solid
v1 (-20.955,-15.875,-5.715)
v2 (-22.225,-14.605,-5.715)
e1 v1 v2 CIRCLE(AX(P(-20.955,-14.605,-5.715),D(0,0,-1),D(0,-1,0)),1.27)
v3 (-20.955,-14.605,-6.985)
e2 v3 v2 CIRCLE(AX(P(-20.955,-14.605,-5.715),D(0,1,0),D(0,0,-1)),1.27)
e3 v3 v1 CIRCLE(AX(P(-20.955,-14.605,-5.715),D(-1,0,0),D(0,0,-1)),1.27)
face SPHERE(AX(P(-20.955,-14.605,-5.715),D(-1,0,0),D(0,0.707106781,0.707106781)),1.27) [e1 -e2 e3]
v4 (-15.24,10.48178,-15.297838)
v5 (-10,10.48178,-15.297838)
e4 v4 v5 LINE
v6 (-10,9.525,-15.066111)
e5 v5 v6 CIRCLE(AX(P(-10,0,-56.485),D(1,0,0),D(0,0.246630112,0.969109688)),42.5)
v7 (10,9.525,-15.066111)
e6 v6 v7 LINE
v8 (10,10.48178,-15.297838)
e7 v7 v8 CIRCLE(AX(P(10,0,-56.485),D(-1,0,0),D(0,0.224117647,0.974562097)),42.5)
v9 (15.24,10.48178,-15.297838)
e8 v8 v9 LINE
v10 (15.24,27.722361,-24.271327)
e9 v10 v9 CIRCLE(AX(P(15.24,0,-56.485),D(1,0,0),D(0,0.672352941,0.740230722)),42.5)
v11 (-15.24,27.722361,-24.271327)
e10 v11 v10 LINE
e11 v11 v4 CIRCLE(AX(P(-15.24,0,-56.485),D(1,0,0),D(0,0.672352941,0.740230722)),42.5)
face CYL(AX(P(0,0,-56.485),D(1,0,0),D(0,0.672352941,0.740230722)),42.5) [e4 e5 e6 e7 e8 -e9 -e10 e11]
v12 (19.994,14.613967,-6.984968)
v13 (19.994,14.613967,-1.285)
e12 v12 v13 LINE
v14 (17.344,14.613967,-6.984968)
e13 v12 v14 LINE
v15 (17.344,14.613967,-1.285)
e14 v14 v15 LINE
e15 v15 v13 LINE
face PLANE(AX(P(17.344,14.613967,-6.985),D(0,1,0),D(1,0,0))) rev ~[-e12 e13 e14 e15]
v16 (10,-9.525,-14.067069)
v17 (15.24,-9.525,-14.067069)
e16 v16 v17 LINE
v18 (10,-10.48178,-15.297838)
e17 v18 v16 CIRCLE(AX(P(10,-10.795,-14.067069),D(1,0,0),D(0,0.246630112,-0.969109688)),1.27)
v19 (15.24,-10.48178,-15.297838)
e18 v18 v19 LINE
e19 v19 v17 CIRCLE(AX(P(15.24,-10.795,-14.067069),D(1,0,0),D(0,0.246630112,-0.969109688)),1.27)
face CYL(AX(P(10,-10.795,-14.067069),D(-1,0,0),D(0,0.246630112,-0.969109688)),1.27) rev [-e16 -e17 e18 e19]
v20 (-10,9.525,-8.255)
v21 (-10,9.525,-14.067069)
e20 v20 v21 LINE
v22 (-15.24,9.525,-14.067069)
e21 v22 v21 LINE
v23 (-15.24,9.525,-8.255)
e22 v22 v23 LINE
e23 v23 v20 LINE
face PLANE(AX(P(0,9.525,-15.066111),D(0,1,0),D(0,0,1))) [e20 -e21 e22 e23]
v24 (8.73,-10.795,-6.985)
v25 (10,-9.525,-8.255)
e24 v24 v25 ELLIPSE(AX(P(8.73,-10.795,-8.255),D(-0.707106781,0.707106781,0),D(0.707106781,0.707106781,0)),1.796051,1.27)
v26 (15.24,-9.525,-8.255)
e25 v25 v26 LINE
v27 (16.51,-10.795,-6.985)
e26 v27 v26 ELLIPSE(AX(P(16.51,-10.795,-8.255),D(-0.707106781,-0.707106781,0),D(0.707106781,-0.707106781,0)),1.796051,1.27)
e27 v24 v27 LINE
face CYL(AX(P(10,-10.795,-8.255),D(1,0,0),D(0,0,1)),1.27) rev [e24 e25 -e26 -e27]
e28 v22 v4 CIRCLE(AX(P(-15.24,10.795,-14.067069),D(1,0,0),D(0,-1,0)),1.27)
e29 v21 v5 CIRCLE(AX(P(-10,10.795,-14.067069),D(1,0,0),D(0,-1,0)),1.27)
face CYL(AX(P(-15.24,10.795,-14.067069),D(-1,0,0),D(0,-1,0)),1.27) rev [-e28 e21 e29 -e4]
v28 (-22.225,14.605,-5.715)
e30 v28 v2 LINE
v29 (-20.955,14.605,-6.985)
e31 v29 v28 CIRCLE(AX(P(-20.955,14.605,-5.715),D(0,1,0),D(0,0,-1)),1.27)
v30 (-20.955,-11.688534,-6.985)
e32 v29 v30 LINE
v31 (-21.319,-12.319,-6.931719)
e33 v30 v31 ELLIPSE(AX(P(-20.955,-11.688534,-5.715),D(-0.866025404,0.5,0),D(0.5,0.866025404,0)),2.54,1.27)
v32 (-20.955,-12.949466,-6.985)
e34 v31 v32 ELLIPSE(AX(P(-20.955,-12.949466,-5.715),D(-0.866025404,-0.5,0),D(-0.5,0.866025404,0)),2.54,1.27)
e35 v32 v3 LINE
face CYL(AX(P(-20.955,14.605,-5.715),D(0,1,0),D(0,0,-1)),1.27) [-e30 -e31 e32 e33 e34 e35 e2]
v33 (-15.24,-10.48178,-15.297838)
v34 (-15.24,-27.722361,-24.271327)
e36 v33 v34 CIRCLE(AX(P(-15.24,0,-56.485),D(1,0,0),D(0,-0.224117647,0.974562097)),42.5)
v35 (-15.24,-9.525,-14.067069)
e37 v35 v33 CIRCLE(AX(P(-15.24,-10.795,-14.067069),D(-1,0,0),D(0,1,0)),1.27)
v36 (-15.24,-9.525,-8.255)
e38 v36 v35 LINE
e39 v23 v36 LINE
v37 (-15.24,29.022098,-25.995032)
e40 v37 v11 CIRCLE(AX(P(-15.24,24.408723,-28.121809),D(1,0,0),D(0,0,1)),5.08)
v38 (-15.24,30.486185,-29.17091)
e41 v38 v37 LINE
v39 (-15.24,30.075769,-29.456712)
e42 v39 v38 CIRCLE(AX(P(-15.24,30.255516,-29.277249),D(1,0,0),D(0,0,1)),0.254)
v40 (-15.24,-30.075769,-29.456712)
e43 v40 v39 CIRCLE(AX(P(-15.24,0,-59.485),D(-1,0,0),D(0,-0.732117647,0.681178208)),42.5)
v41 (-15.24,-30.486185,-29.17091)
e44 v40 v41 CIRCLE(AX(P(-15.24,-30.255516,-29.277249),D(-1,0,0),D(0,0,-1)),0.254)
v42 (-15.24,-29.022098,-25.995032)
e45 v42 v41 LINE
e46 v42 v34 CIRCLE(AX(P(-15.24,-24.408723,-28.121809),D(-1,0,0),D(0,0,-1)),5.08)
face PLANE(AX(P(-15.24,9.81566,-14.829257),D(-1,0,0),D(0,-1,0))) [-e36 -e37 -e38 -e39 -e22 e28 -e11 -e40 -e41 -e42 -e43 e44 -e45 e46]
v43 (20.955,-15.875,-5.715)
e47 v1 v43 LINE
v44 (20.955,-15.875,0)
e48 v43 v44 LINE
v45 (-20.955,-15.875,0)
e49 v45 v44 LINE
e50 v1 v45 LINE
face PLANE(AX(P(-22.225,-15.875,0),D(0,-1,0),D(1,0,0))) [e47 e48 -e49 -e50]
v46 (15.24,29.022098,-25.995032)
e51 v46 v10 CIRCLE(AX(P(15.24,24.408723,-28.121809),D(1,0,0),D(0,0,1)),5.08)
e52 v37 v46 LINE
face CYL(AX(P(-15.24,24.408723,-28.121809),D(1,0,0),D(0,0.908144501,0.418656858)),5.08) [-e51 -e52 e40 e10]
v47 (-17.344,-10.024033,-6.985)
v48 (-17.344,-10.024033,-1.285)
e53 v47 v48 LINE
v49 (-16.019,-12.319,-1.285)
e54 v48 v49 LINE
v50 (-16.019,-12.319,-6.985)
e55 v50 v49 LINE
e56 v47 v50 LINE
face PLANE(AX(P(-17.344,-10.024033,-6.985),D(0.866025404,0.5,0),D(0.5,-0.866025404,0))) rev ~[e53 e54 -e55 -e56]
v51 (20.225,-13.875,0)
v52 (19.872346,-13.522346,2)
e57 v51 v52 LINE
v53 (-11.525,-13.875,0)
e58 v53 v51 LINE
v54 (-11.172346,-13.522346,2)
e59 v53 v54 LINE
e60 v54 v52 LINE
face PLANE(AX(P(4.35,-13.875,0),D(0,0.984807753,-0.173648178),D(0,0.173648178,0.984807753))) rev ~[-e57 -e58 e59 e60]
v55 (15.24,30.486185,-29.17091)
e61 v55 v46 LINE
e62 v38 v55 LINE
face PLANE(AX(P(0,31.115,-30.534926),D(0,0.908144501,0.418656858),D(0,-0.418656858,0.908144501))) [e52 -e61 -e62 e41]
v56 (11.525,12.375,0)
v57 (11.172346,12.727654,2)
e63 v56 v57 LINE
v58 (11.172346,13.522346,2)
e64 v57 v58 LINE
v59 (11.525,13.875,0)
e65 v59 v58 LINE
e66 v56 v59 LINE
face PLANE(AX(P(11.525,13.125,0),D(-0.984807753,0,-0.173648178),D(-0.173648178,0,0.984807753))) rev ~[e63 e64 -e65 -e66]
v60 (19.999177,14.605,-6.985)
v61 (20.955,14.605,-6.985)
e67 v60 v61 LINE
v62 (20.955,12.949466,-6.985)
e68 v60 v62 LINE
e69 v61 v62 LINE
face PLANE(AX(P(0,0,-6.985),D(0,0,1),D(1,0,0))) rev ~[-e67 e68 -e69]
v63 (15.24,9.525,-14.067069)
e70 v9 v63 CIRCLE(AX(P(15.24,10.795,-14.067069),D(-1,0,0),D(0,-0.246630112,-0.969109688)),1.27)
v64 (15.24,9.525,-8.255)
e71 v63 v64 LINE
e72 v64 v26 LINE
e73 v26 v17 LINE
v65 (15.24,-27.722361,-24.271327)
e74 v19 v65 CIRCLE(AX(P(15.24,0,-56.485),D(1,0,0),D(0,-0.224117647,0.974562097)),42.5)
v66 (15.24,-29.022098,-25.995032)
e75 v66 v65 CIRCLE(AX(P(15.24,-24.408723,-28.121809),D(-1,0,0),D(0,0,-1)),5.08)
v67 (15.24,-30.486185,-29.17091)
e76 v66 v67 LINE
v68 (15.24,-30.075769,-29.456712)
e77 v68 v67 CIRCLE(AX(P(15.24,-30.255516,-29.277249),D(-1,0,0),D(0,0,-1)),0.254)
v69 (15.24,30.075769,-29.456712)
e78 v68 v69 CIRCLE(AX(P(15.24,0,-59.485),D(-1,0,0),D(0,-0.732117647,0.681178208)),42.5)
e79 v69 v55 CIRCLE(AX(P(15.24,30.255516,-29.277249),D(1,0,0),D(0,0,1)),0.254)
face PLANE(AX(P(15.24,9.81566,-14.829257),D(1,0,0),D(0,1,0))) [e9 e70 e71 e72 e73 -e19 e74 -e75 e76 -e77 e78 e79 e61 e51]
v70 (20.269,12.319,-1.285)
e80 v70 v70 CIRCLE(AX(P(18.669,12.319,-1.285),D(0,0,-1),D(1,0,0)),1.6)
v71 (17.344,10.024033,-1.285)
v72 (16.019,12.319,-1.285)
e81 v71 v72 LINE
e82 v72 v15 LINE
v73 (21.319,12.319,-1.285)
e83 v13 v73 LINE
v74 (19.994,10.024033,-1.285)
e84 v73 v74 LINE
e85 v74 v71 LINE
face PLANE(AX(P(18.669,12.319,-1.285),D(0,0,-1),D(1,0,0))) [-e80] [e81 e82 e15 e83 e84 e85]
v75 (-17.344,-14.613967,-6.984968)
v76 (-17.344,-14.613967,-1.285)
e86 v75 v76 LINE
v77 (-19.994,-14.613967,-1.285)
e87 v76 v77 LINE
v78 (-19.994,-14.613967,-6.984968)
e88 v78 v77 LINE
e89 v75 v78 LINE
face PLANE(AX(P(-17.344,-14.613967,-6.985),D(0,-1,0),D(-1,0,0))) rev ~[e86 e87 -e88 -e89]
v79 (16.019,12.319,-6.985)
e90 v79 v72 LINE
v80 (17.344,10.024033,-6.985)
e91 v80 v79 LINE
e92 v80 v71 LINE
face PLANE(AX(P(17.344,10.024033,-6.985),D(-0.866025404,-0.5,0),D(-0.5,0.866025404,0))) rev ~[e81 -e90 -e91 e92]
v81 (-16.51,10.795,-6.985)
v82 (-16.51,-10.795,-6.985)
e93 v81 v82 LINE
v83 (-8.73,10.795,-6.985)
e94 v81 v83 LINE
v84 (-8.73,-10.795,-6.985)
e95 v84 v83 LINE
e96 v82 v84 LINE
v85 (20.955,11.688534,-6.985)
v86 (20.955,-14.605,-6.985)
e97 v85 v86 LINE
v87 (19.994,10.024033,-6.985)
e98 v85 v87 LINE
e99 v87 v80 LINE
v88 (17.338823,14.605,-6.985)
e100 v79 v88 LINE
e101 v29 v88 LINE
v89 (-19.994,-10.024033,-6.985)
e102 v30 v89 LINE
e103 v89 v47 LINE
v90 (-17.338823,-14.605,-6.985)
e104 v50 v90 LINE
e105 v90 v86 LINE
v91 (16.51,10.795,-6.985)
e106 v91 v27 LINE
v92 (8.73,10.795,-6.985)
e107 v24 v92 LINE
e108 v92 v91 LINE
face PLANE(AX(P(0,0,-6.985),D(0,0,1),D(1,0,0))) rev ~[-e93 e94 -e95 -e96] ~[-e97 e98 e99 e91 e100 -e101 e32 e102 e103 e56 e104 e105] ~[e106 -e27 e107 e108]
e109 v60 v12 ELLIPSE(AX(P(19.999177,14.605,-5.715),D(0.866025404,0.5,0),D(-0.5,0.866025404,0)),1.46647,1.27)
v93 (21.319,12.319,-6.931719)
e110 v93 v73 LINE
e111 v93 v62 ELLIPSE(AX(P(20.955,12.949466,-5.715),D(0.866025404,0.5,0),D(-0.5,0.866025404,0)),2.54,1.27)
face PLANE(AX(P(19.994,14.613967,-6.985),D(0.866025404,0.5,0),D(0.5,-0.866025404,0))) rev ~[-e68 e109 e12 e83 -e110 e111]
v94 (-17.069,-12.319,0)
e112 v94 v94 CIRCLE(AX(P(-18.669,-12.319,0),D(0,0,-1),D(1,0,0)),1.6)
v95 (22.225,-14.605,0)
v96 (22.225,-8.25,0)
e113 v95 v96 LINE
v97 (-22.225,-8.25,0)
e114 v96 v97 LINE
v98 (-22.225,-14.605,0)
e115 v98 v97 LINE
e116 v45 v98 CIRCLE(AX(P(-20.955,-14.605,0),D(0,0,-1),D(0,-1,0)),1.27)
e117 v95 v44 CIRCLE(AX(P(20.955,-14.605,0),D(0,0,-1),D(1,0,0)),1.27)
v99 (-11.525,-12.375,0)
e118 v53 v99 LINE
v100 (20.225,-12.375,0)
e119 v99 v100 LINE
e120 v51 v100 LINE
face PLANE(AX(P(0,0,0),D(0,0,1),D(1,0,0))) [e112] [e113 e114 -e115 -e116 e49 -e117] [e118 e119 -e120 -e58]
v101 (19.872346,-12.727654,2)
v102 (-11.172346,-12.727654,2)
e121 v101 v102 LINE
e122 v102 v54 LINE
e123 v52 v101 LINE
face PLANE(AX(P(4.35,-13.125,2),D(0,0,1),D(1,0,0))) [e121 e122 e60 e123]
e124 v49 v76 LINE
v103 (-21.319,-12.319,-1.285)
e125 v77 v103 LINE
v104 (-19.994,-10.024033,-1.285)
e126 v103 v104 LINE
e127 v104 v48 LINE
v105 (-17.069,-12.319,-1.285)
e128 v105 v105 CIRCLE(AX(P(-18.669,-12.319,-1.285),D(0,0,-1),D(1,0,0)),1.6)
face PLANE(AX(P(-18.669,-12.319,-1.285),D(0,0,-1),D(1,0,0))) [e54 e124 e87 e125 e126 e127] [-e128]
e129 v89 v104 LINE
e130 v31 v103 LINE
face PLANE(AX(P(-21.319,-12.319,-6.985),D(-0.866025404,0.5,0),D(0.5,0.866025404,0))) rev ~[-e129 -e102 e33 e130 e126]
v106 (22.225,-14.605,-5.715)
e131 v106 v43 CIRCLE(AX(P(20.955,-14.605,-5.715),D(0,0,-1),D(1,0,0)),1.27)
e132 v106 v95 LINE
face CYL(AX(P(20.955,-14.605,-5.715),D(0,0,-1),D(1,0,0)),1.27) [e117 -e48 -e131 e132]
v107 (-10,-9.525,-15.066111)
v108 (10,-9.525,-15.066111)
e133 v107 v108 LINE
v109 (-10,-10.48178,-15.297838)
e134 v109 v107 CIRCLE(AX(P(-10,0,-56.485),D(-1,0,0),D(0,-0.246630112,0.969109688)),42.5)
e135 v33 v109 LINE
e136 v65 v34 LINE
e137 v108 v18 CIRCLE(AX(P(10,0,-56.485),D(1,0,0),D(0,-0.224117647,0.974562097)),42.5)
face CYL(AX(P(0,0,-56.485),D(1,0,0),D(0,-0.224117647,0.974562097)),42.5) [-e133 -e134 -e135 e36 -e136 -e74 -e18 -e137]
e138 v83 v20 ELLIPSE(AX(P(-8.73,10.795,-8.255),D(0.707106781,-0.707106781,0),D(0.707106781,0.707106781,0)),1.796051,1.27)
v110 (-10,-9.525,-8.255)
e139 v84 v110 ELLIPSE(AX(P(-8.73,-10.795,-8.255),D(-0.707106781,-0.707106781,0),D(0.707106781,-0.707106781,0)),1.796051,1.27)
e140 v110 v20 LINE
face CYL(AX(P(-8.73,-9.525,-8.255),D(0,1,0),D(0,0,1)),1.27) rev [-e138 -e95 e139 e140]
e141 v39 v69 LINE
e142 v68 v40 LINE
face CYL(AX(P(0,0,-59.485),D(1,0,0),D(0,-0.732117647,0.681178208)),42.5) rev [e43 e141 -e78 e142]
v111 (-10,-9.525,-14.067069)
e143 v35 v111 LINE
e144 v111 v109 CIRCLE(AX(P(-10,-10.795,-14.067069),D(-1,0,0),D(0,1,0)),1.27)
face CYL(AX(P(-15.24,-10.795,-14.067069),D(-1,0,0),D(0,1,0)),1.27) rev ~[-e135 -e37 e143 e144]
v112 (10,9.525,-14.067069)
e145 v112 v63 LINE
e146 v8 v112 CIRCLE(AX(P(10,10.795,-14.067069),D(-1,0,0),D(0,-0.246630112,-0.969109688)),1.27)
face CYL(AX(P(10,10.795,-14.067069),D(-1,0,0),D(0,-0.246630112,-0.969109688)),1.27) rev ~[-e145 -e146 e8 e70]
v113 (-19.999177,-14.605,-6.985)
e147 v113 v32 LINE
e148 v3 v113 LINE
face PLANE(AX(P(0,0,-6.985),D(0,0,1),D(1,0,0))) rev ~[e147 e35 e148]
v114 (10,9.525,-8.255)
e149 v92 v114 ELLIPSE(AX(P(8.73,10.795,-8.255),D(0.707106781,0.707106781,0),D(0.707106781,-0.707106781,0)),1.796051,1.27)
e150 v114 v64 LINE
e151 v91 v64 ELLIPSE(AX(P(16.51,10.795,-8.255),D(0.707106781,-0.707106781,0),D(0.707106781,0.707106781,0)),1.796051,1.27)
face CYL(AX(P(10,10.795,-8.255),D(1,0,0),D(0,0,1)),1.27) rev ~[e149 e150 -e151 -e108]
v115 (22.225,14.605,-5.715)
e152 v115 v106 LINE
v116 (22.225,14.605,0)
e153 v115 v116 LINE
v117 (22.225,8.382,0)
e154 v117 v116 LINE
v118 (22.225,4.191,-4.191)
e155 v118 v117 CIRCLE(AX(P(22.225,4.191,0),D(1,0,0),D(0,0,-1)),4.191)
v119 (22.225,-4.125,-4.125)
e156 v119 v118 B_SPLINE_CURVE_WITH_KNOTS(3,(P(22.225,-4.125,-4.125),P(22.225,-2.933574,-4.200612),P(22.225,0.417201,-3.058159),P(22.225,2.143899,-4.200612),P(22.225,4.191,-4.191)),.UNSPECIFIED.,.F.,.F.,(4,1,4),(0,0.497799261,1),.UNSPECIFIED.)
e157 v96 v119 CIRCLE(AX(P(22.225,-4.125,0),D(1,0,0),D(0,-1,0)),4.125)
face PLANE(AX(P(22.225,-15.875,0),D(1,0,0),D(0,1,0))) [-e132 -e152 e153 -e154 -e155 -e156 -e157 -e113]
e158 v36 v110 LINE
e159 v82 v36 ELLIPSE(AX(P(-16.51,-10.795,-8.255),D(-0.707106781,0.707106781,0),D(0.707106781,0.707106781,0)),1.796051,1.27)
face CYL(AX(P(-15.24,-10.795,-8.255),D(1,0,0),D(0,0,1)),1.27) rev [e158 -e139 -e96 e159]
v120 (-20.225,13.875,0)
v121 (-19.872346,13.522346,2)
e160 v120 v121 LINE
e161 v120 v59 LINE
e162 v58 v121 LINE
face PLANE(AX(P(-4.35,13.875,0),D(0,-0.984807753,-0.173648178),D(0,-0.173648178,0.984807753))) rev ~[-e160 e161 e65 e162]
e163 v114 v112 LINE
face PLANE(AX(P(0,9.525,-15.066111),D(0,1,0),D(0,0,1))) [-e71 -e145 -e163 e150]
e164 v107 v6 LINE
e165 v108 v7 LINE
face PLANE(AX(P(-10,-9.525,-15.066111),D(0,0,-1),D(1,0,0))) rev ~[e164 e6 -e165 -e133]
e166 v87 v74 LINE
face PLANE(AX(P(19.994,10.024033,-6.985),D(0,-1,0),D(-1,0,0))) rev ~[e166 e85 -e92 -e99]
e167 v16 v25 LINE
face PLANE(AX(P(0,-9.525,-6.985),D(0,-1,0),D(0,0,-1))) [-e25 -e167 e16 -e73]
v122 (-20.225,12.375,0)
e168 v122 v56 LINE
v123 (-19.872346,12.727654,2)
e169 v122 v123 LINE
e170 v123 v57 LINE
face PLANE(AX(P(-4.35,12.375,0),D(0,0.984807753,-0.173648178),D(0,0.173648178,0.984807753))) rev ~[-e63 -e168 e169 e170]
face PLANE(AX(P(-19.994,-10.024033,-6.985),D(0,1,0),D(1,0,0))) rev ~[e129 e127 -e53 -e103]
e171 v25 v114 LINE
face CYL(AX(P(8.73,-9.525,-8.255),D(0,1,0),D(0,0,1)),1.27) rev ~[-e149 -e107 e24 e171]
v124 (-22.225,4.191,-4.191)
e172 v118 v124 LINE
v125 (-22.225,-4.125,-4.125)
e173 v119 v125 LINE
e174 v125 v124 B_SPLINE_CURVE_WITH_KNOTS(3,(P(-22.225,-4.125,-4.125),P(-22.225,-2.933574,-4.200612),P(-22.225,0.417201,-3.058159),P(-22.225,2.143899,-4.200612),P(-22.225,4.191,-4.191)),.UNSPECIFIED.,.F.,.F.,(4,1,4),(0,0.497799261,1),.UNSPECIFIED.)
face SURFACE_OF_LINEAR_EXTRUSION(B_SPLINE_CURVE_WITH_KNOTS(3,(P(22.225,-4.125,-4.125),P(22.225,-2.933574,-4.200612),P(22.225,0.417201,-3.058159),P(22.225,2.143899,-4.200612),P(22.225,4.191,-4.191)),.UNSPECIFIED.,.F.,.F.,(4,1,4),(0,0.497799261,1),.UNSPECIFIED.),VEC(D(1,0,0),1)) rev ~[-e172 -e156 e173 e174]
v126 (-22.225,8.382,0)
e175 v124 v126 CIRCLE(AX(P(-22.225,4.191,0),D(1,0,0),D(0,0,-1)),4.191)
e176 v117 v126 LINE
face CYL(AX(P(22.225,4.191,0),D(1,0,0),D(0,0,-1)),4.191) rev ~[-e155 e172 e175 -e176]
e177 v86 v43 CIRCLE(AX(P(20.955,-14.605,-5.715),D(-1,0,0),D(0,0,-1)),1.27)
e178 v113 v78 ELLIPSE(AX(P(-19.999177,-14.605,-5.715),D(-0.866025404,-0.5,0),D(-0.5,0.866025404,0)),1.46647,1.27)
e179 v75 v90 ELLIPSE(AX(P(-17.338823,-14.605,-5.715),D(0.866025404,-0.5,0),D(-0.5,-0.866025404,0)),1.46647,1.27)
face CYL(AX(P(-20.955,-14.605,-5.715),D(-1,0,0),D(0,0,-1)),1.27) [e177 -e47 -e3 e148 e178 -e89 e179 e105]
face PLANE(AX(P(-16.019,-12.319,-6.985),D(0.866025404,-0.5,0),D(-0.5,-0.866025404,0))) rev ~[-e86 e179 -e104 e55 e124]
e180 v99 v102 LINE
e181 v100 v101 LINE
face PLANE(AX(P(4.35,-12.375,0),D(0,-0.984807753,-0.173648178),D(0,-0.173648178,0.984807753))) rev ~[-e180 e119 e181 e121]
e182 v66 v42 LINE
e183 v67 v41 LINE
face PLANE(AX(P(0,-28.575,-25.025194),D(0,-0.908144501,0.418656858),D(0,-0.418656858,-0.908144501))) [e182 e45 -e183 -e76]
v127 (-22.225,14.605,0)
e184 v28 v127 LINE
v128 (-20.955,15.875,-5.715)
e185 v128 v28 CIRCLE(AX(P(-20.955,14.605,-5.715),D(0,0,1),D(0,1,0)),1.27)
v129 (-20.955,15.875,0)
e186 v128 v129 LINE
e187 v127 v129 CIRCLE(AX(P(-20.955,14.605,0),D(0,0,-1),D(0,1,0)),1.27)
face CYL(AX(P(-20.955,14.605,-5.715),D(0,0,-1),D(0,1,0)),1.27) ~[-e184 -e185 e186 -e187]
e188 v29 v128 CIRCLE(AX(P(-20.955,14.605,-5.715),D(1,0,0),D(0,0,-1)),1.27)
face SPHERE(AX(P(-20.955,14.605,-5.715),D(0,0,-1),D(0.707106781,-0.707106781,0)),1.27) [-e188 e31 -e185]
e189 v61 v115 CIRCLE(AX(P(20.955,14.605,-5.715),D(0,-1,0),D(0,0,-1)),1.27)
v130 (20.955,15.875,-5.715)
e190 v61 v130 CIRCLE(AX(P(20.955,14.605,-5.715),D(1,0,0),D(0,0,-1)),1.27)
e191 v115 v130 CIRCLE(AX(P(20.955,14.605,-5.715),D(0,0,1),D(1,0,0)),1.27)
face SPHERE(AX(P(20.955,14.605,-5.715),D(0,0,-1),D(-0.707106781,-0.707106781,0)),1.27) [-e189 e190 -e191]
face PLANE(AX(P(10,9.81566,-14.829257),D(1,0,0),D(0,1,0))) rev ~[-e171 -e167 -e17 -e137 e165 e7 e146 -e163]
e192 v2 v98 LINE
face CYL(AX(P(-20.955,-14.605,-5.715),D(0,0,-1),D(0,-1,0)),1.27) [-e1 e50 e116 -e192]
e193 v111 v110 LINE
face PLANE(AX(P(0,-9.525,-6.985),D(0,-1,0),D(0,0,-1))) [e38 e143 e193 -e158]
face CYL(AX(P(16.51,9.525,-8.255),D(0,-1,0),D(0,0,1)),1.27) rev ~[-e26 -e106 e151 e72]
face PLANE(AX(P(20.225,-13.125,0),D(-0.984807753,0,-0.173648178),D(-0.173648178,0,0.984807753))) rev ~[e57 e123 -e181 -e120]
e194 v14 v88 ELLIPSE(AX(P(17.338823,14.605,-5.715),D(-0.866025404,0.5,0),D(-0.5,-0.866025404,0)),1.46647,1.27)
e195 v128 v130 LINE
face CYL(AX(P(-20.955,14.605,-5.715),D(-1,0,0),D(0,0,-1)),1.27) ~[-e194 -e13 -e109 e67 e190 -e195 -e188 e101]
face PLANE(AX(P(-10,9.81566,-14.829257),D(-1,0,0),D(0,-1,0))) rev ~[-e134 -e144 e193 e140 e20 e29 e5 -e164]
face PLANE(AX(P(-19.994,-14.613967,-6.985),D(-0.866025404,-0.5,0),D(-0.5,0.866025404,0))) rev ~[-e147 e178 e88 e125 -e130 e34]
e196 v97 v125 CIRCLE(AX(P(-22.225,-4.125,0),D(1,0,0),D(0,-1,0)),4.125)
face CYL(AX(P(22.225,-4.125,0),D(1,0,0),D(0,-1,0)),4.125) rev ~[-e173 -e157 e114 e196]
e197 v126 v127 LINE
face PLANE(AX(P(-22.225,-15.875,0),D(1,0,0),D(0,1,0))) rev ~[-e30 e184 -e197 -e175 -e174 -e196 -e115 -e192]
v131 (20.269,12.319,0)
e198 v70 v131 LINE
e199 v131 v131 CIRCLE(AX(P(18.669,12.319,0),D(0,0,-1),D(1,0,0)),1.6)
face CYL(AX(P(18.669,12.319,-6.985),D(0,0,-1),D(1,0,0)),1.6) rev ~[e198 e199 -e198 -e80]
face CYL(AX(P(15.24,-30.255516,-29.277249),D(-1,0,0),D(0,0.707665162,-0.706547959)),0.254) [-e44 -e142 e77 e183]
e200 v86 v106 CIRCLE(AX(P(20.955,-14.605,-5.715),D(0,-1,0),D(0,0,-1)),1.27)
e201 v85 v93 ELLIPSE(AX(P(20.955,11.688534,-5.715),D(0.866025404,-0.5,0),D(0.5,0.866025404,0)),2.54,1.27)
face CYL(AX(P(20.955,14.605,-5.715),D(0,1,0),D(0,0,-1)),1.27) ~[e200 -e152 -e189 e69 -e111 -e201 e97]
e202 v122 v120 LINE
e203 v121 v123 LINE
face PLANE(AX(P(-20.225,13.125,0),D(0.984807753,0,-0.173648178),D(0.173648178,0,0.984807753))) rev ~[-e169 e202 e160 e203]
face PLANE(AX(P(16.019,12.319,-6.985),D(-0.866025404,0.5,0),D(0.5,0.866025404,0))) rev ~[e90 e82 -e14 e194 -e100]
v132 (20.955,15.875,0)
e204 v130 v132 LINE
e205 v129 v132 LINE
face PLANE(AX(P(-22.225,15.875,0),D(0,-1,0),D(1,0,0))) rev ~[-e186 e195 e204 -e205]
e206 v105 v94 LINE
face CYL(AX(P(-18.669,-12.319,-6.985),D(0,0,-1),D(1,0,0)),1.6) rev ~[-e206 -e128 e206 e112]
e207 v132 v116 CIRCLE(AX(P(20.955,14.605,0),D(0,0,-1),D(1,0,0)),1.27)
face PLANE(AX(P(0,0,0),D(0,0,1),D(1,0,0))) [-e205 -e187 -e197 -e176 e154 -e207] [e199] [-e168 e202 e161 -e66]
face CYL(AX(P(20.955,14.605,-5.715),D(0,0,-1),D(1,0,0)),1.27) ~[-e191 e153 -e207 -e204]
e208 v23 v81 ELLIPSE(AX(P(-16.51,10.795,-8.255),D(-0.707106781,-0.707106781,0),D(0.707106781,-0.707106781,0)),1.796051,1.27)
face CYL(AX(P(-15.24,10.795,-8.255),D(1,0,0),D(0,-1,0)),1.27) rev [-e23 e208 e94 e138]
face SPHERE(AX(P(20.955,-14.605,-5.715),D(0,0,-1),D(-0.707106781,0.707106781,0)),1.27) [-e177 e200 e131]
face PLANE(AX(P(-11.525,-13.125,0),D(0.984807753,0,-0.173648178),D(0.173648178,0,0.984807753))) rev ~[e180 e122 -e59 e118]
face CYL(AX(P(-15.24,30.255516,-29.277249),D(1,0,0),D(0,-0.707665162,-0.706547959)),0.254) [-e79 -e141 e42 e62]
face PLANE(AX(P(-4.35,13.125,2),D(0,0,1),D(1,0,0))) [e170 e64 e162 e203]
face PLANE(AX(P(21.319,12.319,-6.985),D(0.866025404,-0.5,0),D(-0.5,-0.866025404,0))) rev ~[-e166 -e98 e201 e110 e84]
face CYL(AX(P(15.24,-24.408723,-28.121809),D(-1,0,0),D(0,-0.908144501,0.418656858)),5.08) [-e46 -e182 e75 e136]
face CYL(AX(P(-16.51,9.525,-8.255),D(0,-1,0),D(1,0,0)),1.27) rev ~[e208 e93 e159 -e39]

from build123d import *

# Parameters (mm, degrees)
F1_W          = 44.45
F1_H          = 31.75
F2_DEPTH      = 6.985
F4_DEPTH      = 44.45
F6_DEPTH      = 15.24
F6_DEPTH_BACK = 15.24
F7_W          = 20
F7_H          = 8.0811108913
F8_DEPTH      = 25.4
F9_R          = 1.6
F10_DEPTH     = 25.4
F11_R         = 1.6
F12_DEPTH     = 5.7
F13_W         = 31.75
F13_H         = 1.5
F14_DEPTH     = 2
F14_TAPER     = 10
F15_F1_R      = 0.254
F15_F2_R      = 0.254
F16_R         = 5.08
F18_R         = 1.27
F19_T1_DEPTH  = 5.24
F19_T3_DEPTH  = 5.24
F19_T5_DEPTH  = 8.89
F19_T7_DEPTH  = 29.21
F19_T9_DEPTH  = 41.91
F19_S13_W     = 1.2954
F19_S13_H     = 1.2954
F19_T14_DEPTH = 1.2954
F19_S19_W     = 1.2954
F19_S19_H     = 1.2954
F19_T20_DEPTH = 1.2954
F19_S25_W     = 1.2954
F19_S25_H     = 1.2954
F19_T26_DEPTH = 1.2954
F19_S31_W     = 1.2954
F19_S31_H     = 1.2954
F19_T32_DEPTH = 1.2954


# Not quite as in the source:
# - a fillet or chamfer that OpenCascade refuses, or shapes differently, is made with other operations: its cross-section is extruded or revolved along the edge and cut away or added
# - a feature of the source that left no trace in its solid (it failed there, or was rolled back) is left out


with BuildPart() as f2:
    # F1 (on Top) → F2 (new body)
    with BuildSketch(Plane.XY):
        Rectangle(F1_W, F1_H)
    extrude(amount=-F2_DEPTH)

    # F3 (on face) → F4 (cut, through all)
    with BuildSketch(Plane.YZ.offset(22.225)):
        with BuildLine():
            add(Edge.make_bspline(
                [(-4.125, 4.125), (-2.4255892558, 4.1137489608), (-0.0276085061, 2.971292738), (2.5249406681, 4.1137612248), (4.191, 4.191)],
                knots=[0, 0, 0, 0, 0.4977710734, 1, 1, 1, 1], degree=3))
            ThreePointArc((-4.125, 4.125), (-7.0418154724, 2.9168154724), (-8.25, 0))
            ThreePointArc((-8.25, 0), (-7.0418154724, -2.9168154724), (-4.125, -4.125))
            add(Edge.make_bspline(
                [(-4.125, -4.125), (-2.9335741419, -4.2006121948), (0.4172014685, -3.0581585459), (2.1438994445, -4.2006121948), (4.191, -4.191)],
                knots=[0, 0, 0, 0, 0.497799261, 1, 1, 1, 1], degree=3))
            ThreePointArc((4.191, -4.191), (7.15448452, -2.96348452), (8.382, 0))
            ThreePointArc((8.382, 0), (7.15448452, 2.96348452), (4.191, 4.191))
        make_face()
    extrude(amount=-F4_DEPTH, mode=Mode.SUBTRACT)

    # F5 (on Right) → F6 (join, two sides)
    with BuildSketch(Plane.YZ) as f6_sk:
        with BuildLine():
            ThreePointArc((-31.115, -30.5349261659), (0, -16.985), (31.115, -30.5349261659))
            Line((31.115, -30.5349261659), (28.575, -25.0251942949))
            ThreePointArc((28.575, -25.0251942949), (19.6900567688, -18.8213349574), (9.525, -15.0661108913))
            ThreePointArc((9.525, -15.0661108913), (0, -13.985), (-9.525, -15.0661108913))
            ThreePointArc((-9.525, -15.0661108913), (-19.6900567688, -18.8213349574), (-28.575, -25.0251942949))
            Line((-28.575, -25.0251942949), (-31.115, -30.5349261659))
        make_face()
        with BuildLine():
            ThreePointArc((-9.525, -15.0661108913), (0, -13.985), (9.525, -15.0661108913))
            Line((9.525, -15.0661108913), (9.525, -6.985))
            Line((9.525, -6.985), (-9.525, -6.985))
            Line((-9.525, -6.985), (-9.525, -15.0661108913))
        make_face()
    extrude(amount=F6_DEPTH)
    extrude(f6_sk.sketch, amount=-F6_DEPTH_BACK)

    # F7 (on face) → F8 (cut)
    with BuildSketch(Plane.XZ.offset(9.525)):
        with Locations((0, -11.0255554456)):
            Rectangle(F7_W, F7_H)
    extrude(amount=-F8_DEPTH, mode=Mode.SUBTRACT)

    # F9 (on face) → F10 (cut)
    with BuildSketch(Plane(origin=(0, 0, -6.985), x_dir=(1, 0, 0), z_dir=(0, 0, -1))):
        with Locations((-18.669, 12.319)):
            Circle(F9_R)
        with Locations((18.669, -12.319)):
            Circle(F9_R)
    extrude(amount=-F10_DEPTH, mode=Mode.SUBTRACT)

    # F11 (on face) → F12 (cut)
    with BuildSketch(Plane(origin=(0, 0, -6.985), x_dir=(1, 0, 0), z_dir=(0, 0, -1))):
        Polygon((-17.344, 10.02403268), (-16.019, 12.319), (-17.344, 14.61396732), (-19.994, 14.61396732), (-21.319, 12.319), (-19.994, 10.02403268), align=None)
        with Locations((-18.669, 12.319)):
            Circle(F11_R, mode=Mode.SUBTRACT)
        Polygon((19.994, -14.61396732), (21.319, -12.319), (19.994, -10.02403268), (17.344, -10.02403268), (16.019, -12.319), (17.344, -14.61396732), align=None)
        with Locations((18.669, -12.319)):
            Circle(F11_R, mode=Mode.SUBTRACT)
    extrude(amount=-F12_DEPTH, mode=Mode.SUBTRACT)

    # F13 (on face) → F14 (join)
    with BuildSketch(Plane.XY):
        with Locations((-4.35, 13.125)):
            Rectangle(F13_W, F13_H)
        with Locations((4.35, -13.125)):
            Rectangle(F13_W, F13_H)
    extrude(amount=F14_DEPTH, taper=F14_TAPER)

    # F15: fillet of radius 0.254 on 2 edges, made by hand

    # F15_f1
    f15_f1_edges = [f2.edges().sort_by_distance(p)[0] for p in [
        (0, -31.115, -30.5349261659),
    ]]
    fillet(f15_f1_edges, radius=F15_F1_R)

    # F15_f2
    f15_f2_edges = [f2.edges().sort_by_distance(p)[0] for p in [
        (0, 31.115, -30.5349261659),
    ]]
    fillet(f15_f2_edges, radius=F15_F2_R)

    # F16
    f16_edges = [f2.edges().sort_by_distance(p)[0] for p in [
        (0, 28.575, -25.025194),
        (0, -28.575, -25.025194),
    ]]
    fillet(f16_edges, radius=F16_R)

    # F18
    f18_edges = [f2.edges().sort_by_distance(p)[0] for p in [
        (12.62, 9.525, -6.985),
        (15.24, 0, -6.985),
        (12.62, -9.525, -6.985),
        (10, 0, -6.985),
        (-12.62, -9.525, -6.985),
        (-15.24, 0, -6.985),
        (-10, 0, -6.985),
        (-12.62, 9.525, -6.985),
    ]]
    fillet(f18_edges, radius=F18_R)

    # F19: fillet of radius 1.27 on 12 edges, made by hand

    # F19_s2 → F19_t1 (join)
    with BuildSketch(Plane.YZ.offset(-15.24)):
        with BuildLine():
            ThreePointArc((9.525, -14.0670689448), (9.7923311345, -14.8465271838), (10.4817797578, -15.2978382489))
            ThreePointArc((10.4817797578, -15.2978382489), (10.0040608486, -15.1792042016), (9.525, -15.0661108913))
            Line((9.525, -15.0661108913), (9.525, -14.0670689448))
        make_face()
        with BuildLine():
            ThreePointArc((-9.525, -14.0670689448), (-9.7923311345, -14.8465271838), (-10.4817797578, -15.2978382489))
            ThreePointArc((-10.4817797578, -15.2978382489), (-10.0040608486, -15.1792042016), (-9.525, -15.0661108913))
            Line((-9.525, -15.0661108913), (-9.525, -14.0670689448))
        make_face()
    extrude(amount=F19_T1_DEPTH)

    # F19_s4 → F19_t3 (join)
    with BuildSketch(Plane.YZ.offset(10)):
        with BuildLine():
            ThreePointArc((10.4817797578, -15.2978382489), (9.7923311345, -14.8465271838), (9.525, -14.0670689448))
            Line((9.525, -14.0670689448), (9.525, -15.0661108913))
            ThreePointArc((9.525, -15.0661108913), (10.0040608486, -15.1792042016), (10.4817797578, -15.2978382489))
        make_face()
        with BuildLine():
            ThreePointArc((-10.4817797578, -15.2978382489), (-9.7923311345, -14.8465271838), (-9.525, -14.0670689448))
            Line((-9.525, -14.0670689448), (-9.525, -15.0661108913))
            ThreePointArc((-9.525, -15.0661108913), (-10.0040608486, -15.1792042016), (-10.4817797578, -15.2978382489))
        make_face()
    extrude(amount=F19_T3_DEPTH)

    # F19_s6 → F19_t5 (cut)
    with BuildSketch(Plane.XY.offset(-5.715)):
        with BuildLine():
            ThreePointArc((-20.955, -15.875), (-21.8530256121, -15.5030256121), (-22.225, -14.605))
            Line((-22.225, -14.605), (-22.225, -15.875))
            Line((-22.225, -15.875), (-20.955, -15.875))
        make_face()
        with BuildLine():
            ThreePointArc((22.225, -14.605), (21.8530256121, -15.5030256121), (20.955, -15.875))
            Line((20.955, -15.875), (22.225, -15.875))
            Line((22.225, -15.875), (22.225, -14.605))
        make_face()
        with BuildLine():
            ThreePointArc((22.225, 14.605), (21.8530256121, 15.5030256121), (20.955, 15.875))
            Line((20.955, 15.875), (22.225, 15.875))
            Line((22.225, 15.875), (22.225, 14.605))
        make_face()
        with BuildLine():
            ThreePointArc((-20.955, 15.875), (-21.8530256121, 15.5030256121), (-22.225, 14.605))
            Line((-22.225, 14.605), (-22.225, 15.875))
            Line((-22.225, 15.875), (-20.955, 15.875))
        make_face()
    extrude(amount=F19_T5_DEPTH, mode=Mode.SUBTRACT)

    # F19_s8 → F19_t7 (cut)
    with BuildSketch(Plane.XZ.offset(-14.605)):
        with BuildLine():
            ThreePointArc((-20.955, -6.985), (-21.8530256121, -6.6130256121), (-22.225, -5.715))
            Line((-22.225, -5.715), (-22.225, -6.985))
            Line((-22.225, -6.985), (-20.955, -6.985))
        make_face()
        with BuildLine():
            ThreePointArc((20.955, -6.985), (21.8530256121, -6.6130256121), (22.225, -5.715))
            Line((22.225, -5.715), (22.225, -6.985))
            Line((22.225, -6.985), (20.955, -6.985))
        make_face()
    extrude(amount=F19_T7_DEPTH, mode=Mode.SUBTRACT)

    # F19_s10 → F19_t9 (cut)
    with BuildSketch(Plane.YZ.offset(-20.955)):
        with BuildLine():
            ThreePointArc((-14.605, -6.985), (-15.5030256121, -6.6130256121), (-15.875, -5.715))
            Line((-15.875, -5.715), (-15.875, -6.985))
            Line((-15.875, -6.985), (-14.605, -6.985))
        make_face()
        with BuildLine():
            ThreePointArc((14.605, -6.985), (15.5030256121, -6.6130256121), (15.875, -5.715))
            Line((15.875, -5.715), (15.875, -6.985))
            Line((15.875, -6.985), (14.605, -6.985))
        make_face()
    extrude(amount=F19_T9_DEPTH, mode=Mode.SUBTRACT)


with BuildPart() as f19_tool12:
    # F19_s13 → F19_t14 (new body)
    with BuildSketch(Plane.YZ.offset(-20.955)):
        with Locations((-15.2527, -6.3627)):
            Rectangle(F19_S13_W, F19_S13_H)
    extrude(amount=-F19_T14_DEPTH)

    # F19_s15 → F19_t16 (revolve, cut)
    with BuildSketch(Plane(origin=(-20.955, -14.605, -5.715), x_dir=(0, 0.7071067812, 0.7071067812), z_dir=(0, -0.7071067812, 0.7071067812))):
        with BuildLine():
            ThreePointArc((0, -1.27), (1.27, 0), (0, 1.27))
            Line((0, 1.27), (0, -1.27))
        make_face()
    revolve(axis=Axis((-20.955, -14.605, -5.715), (-1, 0, 0)), mode=Mode.SUBTRACT)


with BuildPart() as f2_1:
    add(f2.part)

    # F19_t11: cut F19_tool12
    add(f19_tool12.part, mode=Mode.SUBTRACT)


with BuildPart() as f19_tool18:
    # F19_s19 → F19_t20 (new body)
    with BuildSketch(Plane.XY.offset(-5.715)):
        with Locations((-21.6027, 15.2527)):
            Rectangle(F19_S19_W, F19_S19_H)
    extrude(amount=-F19_T20_DEPTH)

    # F19_s21 → F19_t22 (revolve, cut)
    with BuildSketch(Plane(origin=(-20.955, 14.605, -5.715), x_dir=(0.7071067812, -0.7071067812, 0), z_dir=(0.7071067812, 0.7071067812, 0))):
        with BuildLine():
            ThreePointArc((0, -1.27), (1.27, 0), (0, 1.27))
            Line((0, 1.27), (0, -1.27))
        make_face()
    revolve(axis=Axis((-20.955, 14.605, -5.715), (0, 0, -1)), mode=Mode.SUBTRACT)


with BuildPart() as f2_2:
    add(f2_1.part)

    # F19_t17: cut F19_tool18
    add(f19_tool18.part, mode=Mode.SUBTRACT)


with BuildPart() as f19_tool24:
    # F19_s25 → F19_t26 (new body)
    with BuildSketch(Plane.XY.offset(-5.715)):
        with Locations((21.6027, -15.2527)):
            Rectangle(F19_S25_W, F19_S25_H)
    extrude(amount=-F19_T26_DEPTH)

    # F19_s27 → F19_t28 (revolve, cut)
    with BuildSketch(Plane(origin=(20.955, -14.605, -5.715), x_dir=(-0.7071067812, 0.7071067812, 0), z_dir=(-0.7071067812, -0.7071067812, 0))):
        with BuildLine():
            ThreePointArc((0, -1.27), (1.27, 0), (0, 1.27))
            Line((0, 1.27), (0, -1.27))
        make_face()
    revolve(axis=Axis((20.955, -14.605, -5.715), (0, 0, -1)), mode=Mode.SUBTRACT)


with BuildPart() as f2_3:
    add(f2_2.part)

    # F19_t23: cut F19_tool24
    add(f19_tool24.part, mode=Mode.SUBTRACT)


with BuildPart() as f19_tool30:
    # F19_s31 → F19_t32 (new body)
    with BuildSketch(Plane.XY.offset(-5.715)):
        with Locations((21.6027, 15.2527)):
            Rectangle(F19_S31_W, F19_S31_H)
    extrude(amount=-F19_T32_DEPTH)

    # F19_s33 → F19_t34 (revolve, cut)
    with BuildSketch(Plane(origin=(20.955, 14.605, -5.715), x_dir=(-0.7071067812, -0.7071067812, 0), z_dir=(0.7071067812, -0.7071067812, 0))):
        with BuildLine():
            ThreePointArc((0, -1.27), (1.27, 0), (0, 1.27))
            Line((0, 1.27), (0, -1.27))
        make_face()
    revolve(axis=Axis((20.955, 14.605, -5.715), (0, 0, -1)), mode=Mode.SUBTRACT)


with BuildPart() as f2_4:
    add(f2_3.part)

    # F19_t29: cut F19_tool30
    add(f19_tool30.part, mode=Mode.SUBTRACT)


solid = f2_4.part
